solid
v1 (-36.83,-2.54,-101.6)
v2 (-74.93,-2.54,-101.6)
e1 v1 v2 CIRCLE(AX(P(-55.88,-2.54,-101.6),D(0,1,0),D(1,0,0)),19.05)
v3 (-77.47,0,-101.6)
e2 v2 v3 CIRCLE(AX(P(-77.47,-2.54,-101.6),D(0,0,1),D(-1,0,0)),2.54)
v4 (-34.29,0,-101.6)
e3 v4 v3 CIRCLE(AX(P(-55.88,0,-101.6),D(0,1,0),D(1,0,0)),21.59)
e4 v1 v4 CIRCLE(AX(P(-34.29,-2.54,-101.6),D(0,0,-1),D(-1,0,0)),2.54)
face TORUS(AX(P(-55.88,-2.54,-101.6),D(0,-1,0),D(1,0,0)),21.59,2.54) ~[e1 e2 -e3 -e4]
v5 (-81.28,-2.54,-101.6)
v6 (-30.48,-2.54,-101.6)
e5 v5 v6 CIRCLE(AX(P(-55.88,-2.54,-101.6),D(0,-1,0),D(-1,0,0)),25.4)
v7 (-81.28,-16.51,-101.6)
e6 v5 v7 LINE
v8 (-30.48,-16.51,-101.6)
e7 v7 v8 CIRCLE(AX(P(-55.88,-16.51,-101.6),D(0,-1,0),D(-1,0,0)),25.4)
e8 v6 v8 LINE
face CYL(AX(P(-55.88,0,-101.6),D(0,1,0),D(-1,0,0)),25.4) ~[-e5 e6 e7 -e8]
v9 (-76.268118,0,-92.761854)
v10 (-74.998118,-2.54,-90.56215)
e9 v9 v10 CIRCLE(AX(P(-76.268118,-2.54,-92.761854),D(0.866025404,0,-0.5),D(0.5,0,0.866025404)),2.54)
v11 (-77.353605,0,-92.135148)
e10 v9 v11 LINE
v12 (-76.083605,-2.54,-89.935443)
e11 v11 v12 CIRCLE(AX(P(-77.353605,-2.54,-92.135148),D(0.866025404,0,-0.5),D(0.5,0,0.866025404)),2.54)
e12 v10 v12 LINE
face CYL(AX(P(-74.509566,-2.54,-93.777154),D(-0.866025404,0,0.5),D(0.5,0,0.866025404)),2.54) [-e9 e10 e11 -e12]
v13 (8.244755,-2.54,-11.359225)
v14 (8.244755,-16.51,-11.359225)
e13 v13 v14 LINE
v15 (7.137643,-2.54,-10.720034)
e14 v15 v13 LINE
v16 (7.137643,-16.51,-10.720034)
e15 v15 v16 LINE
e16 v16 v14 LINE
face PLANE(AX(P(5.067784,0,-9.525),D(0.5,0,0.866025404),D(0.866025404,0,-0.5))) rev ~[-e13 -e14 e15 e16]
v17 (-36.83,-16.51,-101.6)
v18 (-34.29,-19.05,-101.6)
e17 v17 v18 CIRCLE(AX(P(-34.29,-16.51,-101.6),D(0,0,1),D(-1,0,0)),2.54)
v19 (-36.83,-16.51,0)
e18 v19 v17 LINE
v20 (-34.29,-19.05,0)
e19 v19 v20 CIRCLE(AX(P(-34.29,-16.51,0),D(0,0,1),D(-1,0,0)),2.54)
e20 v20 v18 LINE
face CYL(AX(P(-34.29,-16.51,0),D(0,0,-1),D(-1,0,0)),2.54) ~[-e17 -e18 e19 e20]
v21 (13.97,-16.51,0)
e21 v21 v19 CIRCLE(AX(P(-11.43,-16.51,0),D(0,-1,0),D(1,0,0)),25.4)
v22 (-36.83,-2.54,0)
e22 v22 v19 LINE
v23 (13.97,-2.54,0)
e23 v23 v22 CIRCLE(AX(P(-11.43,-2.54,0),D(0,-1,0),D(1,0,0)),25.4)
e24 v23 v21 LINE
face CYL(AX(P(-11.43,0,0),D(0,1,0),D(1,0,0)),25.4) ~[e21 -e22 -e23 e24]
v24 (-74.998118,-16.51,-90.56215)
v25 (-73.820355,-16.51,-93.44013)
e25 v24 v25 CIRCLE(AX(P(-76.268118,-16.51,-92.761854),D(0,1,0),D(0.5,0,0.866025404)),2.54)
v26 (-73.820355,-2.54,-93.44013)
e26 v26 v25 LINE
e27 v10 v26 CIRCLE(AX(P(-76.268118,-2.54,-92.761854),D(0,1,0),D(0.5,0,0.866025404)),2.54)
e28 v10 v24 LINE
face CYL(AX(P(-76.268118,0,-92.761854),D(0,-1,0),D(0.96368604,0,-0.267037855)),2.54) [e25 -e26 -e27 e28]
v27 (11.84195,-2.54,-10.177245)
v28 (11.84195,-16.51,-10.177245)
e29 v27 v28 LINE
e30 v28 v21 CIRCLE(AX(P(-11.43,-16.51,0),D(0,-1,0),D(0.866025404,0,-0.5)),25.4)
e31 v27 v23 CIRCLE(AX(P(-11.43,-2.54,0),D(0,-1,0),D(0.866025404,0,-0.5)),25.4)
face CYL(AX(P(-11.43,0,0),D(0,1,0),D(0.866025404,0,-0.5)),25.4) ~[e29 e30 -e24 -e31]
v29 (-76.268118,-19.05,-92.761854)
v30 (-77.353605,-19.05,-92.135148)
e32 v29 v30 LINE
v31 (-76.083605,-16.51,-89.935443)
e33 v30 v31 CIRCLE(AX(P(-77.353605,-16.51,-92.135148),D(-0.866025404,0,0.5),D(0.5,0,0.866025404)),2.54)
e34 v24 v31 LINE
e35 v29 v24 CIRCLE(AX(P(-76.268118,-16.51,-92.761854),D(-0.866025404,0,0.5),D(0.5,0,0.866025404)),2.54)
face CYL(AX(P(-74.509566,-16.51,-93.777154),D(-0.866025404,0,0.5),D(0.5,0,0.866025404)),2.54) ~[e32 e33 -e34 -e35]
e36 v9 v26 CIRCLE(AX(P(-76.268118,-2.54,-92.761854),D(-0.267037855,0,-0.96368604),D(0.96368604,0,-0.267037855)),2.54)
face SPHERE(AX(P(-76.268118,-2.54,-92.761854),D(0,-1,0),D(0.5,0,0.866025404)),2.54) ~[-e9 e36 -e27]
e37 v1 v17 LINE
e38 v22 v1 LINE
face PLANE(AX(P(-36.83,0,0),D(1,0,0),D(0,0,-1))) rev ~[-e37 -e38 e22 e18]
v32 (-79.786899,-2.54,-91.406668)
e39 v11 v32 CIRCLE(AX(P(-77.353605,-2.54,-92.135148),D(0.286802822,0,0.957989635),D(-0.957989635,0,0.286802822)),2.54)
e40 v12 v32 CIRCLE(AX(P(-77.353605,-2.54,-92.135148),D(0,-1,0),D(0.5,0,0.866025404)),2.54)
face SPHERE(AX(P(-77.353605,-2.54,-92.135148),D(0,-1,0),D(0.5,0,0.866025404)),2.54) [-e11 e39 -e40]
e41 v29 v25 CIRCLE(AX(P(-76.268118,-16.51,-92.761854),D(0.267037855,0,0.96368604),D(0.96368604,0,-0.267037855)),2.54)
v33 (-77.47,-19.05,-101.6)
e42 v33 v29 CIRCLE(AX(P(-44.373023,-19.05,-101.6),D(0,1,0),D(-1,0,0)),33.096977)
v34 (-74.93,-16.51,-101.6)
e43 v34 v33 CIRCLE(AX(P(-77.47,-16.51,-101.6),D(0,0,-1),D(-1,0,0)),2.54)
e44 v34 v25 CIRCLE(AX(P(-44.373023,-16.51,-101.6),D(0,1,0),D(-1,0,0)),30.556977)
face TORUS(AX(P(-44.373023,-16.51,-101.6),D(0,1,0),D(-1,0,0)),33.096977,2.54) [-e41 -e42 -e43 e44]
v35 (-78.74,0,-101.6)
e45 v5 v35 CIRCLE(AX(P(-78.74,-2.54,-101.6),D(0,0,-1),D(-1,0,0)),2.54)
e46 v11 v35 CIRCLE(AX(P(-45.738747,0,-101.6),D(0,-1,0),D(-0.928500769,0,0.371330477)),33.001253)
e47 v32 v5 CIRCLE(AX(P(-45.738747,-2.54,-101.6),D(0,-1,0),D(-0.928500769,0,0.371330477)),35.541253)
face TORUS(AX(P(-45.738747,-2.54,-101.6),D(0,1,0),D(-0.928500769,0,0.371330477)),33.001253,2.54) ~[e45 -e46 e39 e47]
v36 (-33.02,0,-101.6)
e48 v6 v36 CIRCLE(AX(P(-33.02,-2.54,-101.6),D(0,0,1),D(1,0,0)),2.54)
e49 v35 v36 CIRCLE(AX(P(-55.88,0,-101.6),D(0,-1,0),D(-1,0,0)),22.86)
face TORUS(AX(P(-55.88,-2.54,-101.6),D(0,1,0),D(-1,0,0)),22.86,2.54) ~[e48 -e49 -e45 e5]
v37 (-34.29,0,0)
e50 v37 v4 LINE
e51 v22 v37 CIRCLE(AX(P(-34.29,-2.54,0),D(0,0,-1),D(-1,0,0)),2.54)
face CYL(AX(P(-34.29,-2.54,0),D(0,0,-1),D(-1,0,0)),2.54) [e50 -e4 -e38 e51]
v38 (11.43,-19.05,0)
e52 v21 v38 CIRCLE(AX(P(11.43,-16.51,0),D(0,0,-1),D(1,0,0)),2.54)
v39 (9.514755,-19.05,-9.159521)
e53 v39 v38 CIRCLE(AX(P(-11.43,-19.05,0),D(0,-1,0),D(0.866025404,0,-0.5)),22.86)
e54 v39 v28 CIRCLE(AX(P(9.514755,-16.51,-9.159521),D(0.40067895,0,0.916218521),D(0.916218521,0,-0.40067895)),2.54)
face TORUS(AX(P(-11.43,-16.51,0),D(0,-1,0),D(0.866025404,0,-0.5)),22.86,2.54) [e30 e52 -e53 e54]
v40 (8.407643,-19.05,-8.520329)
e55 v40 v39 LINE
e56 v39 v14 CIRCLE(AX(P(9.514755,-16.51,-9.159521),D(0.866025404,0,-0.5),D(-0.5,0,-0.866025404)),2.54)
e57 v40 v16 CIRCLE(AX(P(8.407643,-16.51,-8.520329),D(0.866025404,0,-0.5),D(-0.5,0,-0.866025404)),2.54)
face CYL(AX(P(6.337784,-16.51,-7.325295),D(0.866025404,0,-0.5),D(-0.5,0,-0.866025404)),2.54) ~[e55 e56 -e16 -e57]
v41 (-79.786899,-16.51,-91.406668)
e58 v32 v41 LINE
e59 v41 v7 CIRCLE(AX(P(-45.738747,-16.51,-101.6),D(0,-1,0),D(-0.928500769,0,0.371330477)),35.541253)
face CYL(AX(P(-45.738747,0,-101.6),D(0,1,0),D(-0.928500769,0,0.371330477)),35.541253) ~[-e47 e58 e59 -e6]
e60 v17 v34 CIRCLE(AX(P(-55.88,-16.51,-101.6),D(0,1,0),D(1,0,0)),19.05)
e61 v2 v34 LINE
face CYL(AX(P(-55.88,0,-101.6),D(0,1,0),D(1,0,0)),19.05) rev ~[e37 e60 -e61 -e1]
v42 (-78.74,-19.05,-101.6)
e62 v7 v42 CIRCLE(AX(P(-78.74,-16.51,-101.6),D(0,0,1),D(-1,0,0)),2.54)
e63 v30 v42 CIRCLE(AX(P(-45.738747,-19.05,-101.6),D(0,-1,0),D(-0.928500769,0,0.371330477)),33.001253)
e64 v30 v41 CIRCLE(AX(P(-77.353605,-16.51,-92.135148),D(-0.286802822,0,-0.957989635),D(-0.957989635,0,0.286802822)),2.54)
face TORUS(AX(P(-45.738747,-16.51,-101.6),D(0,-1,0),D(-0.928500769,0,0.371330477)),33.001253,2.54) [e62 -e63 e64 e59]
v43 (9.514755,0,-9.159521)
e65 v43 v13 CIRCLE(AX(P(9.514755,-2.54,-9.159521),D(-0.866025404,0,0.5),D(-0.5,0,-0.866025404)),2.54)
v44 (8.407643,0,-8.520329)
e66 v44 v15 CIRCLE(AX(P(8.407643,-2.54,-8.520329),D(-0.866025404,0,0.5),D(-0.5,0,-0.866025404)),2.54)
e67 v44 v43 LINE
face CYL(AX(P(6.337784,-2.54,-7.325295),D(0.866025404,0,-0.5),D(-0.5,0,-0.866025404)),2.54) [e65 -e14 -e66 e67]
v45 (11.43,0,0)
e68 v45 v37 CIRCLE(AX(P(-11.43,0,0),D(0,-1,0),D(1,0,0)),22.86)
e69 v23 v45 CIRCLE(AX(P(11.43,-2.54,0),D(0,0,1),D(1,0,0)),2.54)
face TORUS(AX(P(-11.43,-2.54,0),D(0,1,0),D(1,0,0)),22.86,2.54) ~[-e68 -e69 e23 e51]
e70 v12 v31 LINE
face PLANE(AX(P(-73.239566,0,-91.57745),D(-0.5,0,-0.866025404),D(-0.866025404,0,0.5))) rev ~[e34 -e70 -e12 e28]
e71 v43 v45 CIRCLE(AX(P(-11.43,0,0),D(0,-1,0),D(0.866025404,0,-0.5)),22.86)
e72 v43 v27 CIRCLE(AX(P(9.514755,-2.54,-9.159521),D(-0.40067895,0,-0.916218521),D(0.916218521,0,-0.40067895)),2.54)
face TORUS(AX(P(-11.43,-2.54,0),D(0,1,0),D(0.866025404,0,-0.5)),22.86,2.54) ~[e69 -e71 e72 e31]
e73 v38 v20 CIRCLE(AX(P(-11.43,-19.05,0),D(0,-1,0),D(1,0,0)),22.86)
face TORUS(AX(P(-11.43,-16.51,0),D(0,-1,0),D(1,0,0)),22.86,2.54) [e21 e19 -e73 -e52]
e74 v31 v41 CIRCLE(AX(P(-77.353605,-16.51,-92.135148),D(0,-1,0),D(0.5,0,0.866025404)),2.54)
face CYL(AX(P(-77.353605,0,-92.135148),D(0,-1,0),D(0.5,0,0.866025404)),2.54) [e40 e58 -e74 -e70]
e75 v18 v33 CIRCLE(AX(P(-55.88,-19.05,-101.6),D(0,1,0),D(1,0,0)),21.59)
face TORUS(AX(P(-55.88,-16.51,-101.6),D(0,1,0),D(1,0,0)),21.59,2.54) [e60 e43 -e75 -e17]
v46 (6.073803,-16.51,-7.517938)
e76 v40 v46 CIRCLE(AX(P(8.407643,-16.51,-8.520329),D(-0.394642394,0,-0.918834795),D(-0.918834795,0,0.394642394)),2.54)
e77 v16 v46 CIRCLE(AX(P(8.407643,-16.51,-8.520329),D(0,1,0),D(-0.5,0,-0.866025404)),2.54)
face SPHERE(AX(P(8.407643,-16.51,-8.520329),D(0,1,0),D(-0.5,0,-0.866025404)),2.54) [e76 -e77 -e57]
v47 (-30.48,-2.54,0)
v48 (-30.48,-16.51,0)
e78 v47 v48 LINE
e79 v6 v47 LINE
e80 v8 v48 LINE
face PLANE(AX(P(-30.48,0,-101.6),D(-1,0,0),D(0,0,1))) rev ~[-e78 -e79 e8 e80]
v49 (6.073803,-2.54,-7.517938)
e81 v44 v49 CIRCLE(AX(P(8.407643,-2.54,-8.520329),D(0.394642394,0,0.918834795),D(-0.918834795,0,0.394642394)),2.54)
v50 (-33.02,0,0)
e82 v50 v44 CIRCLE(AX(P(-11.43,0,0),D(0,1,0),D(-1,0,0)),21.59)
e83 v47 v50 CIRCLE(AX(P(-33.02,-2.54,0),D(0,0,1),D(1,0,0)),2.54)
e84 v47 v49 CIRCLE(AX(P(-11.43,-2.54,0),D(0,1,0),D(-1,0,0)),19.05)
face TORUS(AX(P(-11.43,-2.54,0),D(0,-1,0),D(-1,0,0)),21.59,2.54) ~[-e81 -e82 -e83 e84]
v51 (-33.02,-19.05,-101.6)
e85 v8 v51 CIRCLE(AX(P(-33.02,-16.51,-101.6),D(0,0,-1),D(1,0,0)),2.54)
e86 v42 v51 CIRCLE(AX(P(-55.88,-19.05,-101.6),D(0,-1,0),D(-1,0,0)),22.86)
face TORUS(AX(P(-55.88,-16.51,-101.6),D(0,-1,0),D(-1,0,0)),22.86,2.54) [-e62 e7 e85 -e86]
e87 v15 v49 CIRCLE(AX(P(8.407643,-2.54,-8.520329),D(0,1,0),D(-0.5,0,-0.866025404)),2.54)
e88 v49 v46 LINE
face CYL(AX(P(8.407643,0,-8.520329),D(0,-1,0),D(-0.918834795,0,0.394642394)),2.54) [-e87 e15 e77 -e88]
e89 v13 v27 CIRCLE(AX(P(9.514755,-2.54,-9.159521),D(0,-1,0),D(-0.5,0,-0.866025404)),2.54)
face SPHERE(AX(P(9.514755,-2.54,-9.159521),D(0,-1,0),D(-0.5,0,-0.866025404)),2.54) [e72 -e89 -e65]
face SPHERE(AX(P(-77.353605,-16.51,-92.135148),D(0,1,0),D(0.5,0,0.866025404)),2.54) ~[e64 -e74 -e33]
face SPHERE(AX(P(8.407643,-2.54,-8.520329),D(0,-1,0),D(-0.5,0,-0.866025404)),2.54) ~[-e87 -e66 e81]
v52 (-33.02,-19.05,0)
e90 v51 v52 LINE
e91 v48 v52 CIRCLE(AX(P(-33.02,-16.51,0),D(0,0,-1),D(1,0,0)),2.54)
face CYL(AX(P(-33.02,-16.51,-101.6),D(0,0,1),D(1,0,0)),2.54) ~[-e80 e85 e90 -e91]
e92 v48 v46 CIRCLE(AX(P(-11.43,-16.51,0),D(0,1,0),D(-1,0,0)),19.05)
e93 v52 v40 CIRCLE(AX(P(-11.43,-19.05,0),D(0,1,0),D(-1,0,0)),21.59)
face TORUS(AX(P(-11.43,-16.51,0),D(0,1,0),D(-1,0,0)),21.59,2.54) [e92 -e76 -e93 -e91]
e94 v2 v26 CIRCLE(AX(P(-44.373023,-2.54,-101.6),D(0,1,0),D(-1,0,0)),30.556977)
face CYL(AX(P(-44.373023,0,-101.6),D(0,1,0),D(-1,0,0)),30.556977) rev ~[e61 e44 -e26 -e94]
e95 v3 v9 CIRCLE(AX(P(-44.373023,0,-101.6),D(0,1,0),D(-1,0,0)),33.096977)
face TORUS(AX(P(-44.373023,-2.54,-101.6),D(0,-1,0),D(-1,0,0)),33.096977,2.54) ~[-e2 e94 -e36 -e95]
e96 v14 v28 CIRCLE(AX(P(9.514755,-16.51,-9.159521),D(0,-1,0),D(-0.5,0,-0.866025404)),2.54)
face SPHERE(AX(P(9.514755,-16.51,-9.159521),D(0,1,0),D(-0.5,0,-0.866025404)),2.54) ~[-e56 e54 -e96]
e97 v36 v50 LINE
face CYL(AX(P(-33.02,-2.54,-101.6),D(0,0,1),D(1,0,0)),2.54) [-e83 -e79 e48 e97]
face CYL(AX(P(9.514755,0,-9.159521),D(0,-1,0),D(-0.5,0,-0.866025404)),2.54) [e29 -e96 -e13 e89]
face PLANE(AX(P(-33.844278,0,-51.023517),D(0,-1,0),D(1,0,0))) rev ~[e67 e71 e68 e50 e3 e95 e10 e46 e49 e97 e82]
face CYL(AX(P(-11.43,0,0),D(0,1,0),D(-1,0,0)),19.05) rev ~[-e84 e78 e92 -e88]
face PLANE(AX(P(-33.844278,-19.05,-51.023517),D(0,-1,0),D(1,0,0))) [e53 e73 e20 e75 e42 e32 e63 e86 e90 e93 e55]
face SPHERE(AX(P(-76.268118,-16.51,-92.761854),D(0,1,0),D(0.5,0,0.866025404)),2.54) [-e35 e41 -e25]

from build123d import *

# Parameters (mm, degrees)
F1_DEPTH = 19.05
F2_R     = 2.54


# Not quite as in the source:
# - a feature names something its author has since deleted; it is built from what else it names


with BuildPart() as f1:
    # F0 (on Front) → F1 (new body)
    with BuildSketch(Plane.XZ):
        with BuildLine():
            ThreePointArc((13.97, 0), (-11.43, 25.4), (-36.83, 0))
            Line((-36.83, 0), (-36.83, -101.6))
            ThreePointArc((-36.83, -101.6), (-55.88, -120.65), (-74.93, -101.6))
            ThreePointArc((-74.93, -101.6), (-74.5044281022, -96.5179462529), (-73.2395664242, -91.577449652))
            Line((-73.2395664242, -91.577449652), (-78.7388277382, -88.402449652))
            ThreePointArc((-78.7388277382, -88.402449652), (-80.638925247, -94.8800131761), (-81.28, -101.6))
            ThreePointArc((-81.28, -101.6), (-55.88, -127), (-30.48, -101.6))
            Line((-30.48, -101.6), (-30.48, 0))
            ThreePointArc((-30.48, 0), (-6.4994971908, 18.4008869908), (5.0677839421, -9.525))
            Line((5.0677839421, -9.525), (10.5670452561, -12.7))
            ThreePointArc((10.5670452561, -12.7), (13.1045159877, -6.5740037456), (13.97, 0))
        make_face()
    extrude(amount=F1_DEPTH)

    # F2
    f2_edges = [f1.edges().sort_by_distance(p)[0] for p in [
        (-73.239566, -9.525, -91.57745),
        (-78.738828, -9.525, -88.40245),
        (-75.989197, 0, -89.98995),
        (-75.989197, -19.05, -89.98995),
        (5.067784, -9.525, -9.525),
        (10.567045, -9.525, -12.7),
        (7.817415, 0, -11.1125),
        (7.817415, -19.05, -11.1125),
        (-30.48, 0, -50.8),
        (-6.499497, 0, 18.400887),
        (-4.855996, 0, 24.534516),
        (-36.83, 0, -50.8),
        (-55.88, 0, -120.65),
        (-74.504428, 0, -96.517946),
        (-80.638925, 0, -94.880013),
        (-55.88, 0, -127),
        (-30.48, -19.05, -50.8),
        (-6.499497, -19.05, 18.400887),
        (-4.855996, -19.05, 24.534516),
        (-36.83, -19.05, -50.8),
        (-55.88, -19.05, -120.65),
        (-74.504428, -19.05, -96.517946),
        (-80.638925, -19.05, -94.880013),
        (-55.88, -19.05, -127),
    ]]
    fillet(f2_edges, radius=F2_R)


solid = f1.part
